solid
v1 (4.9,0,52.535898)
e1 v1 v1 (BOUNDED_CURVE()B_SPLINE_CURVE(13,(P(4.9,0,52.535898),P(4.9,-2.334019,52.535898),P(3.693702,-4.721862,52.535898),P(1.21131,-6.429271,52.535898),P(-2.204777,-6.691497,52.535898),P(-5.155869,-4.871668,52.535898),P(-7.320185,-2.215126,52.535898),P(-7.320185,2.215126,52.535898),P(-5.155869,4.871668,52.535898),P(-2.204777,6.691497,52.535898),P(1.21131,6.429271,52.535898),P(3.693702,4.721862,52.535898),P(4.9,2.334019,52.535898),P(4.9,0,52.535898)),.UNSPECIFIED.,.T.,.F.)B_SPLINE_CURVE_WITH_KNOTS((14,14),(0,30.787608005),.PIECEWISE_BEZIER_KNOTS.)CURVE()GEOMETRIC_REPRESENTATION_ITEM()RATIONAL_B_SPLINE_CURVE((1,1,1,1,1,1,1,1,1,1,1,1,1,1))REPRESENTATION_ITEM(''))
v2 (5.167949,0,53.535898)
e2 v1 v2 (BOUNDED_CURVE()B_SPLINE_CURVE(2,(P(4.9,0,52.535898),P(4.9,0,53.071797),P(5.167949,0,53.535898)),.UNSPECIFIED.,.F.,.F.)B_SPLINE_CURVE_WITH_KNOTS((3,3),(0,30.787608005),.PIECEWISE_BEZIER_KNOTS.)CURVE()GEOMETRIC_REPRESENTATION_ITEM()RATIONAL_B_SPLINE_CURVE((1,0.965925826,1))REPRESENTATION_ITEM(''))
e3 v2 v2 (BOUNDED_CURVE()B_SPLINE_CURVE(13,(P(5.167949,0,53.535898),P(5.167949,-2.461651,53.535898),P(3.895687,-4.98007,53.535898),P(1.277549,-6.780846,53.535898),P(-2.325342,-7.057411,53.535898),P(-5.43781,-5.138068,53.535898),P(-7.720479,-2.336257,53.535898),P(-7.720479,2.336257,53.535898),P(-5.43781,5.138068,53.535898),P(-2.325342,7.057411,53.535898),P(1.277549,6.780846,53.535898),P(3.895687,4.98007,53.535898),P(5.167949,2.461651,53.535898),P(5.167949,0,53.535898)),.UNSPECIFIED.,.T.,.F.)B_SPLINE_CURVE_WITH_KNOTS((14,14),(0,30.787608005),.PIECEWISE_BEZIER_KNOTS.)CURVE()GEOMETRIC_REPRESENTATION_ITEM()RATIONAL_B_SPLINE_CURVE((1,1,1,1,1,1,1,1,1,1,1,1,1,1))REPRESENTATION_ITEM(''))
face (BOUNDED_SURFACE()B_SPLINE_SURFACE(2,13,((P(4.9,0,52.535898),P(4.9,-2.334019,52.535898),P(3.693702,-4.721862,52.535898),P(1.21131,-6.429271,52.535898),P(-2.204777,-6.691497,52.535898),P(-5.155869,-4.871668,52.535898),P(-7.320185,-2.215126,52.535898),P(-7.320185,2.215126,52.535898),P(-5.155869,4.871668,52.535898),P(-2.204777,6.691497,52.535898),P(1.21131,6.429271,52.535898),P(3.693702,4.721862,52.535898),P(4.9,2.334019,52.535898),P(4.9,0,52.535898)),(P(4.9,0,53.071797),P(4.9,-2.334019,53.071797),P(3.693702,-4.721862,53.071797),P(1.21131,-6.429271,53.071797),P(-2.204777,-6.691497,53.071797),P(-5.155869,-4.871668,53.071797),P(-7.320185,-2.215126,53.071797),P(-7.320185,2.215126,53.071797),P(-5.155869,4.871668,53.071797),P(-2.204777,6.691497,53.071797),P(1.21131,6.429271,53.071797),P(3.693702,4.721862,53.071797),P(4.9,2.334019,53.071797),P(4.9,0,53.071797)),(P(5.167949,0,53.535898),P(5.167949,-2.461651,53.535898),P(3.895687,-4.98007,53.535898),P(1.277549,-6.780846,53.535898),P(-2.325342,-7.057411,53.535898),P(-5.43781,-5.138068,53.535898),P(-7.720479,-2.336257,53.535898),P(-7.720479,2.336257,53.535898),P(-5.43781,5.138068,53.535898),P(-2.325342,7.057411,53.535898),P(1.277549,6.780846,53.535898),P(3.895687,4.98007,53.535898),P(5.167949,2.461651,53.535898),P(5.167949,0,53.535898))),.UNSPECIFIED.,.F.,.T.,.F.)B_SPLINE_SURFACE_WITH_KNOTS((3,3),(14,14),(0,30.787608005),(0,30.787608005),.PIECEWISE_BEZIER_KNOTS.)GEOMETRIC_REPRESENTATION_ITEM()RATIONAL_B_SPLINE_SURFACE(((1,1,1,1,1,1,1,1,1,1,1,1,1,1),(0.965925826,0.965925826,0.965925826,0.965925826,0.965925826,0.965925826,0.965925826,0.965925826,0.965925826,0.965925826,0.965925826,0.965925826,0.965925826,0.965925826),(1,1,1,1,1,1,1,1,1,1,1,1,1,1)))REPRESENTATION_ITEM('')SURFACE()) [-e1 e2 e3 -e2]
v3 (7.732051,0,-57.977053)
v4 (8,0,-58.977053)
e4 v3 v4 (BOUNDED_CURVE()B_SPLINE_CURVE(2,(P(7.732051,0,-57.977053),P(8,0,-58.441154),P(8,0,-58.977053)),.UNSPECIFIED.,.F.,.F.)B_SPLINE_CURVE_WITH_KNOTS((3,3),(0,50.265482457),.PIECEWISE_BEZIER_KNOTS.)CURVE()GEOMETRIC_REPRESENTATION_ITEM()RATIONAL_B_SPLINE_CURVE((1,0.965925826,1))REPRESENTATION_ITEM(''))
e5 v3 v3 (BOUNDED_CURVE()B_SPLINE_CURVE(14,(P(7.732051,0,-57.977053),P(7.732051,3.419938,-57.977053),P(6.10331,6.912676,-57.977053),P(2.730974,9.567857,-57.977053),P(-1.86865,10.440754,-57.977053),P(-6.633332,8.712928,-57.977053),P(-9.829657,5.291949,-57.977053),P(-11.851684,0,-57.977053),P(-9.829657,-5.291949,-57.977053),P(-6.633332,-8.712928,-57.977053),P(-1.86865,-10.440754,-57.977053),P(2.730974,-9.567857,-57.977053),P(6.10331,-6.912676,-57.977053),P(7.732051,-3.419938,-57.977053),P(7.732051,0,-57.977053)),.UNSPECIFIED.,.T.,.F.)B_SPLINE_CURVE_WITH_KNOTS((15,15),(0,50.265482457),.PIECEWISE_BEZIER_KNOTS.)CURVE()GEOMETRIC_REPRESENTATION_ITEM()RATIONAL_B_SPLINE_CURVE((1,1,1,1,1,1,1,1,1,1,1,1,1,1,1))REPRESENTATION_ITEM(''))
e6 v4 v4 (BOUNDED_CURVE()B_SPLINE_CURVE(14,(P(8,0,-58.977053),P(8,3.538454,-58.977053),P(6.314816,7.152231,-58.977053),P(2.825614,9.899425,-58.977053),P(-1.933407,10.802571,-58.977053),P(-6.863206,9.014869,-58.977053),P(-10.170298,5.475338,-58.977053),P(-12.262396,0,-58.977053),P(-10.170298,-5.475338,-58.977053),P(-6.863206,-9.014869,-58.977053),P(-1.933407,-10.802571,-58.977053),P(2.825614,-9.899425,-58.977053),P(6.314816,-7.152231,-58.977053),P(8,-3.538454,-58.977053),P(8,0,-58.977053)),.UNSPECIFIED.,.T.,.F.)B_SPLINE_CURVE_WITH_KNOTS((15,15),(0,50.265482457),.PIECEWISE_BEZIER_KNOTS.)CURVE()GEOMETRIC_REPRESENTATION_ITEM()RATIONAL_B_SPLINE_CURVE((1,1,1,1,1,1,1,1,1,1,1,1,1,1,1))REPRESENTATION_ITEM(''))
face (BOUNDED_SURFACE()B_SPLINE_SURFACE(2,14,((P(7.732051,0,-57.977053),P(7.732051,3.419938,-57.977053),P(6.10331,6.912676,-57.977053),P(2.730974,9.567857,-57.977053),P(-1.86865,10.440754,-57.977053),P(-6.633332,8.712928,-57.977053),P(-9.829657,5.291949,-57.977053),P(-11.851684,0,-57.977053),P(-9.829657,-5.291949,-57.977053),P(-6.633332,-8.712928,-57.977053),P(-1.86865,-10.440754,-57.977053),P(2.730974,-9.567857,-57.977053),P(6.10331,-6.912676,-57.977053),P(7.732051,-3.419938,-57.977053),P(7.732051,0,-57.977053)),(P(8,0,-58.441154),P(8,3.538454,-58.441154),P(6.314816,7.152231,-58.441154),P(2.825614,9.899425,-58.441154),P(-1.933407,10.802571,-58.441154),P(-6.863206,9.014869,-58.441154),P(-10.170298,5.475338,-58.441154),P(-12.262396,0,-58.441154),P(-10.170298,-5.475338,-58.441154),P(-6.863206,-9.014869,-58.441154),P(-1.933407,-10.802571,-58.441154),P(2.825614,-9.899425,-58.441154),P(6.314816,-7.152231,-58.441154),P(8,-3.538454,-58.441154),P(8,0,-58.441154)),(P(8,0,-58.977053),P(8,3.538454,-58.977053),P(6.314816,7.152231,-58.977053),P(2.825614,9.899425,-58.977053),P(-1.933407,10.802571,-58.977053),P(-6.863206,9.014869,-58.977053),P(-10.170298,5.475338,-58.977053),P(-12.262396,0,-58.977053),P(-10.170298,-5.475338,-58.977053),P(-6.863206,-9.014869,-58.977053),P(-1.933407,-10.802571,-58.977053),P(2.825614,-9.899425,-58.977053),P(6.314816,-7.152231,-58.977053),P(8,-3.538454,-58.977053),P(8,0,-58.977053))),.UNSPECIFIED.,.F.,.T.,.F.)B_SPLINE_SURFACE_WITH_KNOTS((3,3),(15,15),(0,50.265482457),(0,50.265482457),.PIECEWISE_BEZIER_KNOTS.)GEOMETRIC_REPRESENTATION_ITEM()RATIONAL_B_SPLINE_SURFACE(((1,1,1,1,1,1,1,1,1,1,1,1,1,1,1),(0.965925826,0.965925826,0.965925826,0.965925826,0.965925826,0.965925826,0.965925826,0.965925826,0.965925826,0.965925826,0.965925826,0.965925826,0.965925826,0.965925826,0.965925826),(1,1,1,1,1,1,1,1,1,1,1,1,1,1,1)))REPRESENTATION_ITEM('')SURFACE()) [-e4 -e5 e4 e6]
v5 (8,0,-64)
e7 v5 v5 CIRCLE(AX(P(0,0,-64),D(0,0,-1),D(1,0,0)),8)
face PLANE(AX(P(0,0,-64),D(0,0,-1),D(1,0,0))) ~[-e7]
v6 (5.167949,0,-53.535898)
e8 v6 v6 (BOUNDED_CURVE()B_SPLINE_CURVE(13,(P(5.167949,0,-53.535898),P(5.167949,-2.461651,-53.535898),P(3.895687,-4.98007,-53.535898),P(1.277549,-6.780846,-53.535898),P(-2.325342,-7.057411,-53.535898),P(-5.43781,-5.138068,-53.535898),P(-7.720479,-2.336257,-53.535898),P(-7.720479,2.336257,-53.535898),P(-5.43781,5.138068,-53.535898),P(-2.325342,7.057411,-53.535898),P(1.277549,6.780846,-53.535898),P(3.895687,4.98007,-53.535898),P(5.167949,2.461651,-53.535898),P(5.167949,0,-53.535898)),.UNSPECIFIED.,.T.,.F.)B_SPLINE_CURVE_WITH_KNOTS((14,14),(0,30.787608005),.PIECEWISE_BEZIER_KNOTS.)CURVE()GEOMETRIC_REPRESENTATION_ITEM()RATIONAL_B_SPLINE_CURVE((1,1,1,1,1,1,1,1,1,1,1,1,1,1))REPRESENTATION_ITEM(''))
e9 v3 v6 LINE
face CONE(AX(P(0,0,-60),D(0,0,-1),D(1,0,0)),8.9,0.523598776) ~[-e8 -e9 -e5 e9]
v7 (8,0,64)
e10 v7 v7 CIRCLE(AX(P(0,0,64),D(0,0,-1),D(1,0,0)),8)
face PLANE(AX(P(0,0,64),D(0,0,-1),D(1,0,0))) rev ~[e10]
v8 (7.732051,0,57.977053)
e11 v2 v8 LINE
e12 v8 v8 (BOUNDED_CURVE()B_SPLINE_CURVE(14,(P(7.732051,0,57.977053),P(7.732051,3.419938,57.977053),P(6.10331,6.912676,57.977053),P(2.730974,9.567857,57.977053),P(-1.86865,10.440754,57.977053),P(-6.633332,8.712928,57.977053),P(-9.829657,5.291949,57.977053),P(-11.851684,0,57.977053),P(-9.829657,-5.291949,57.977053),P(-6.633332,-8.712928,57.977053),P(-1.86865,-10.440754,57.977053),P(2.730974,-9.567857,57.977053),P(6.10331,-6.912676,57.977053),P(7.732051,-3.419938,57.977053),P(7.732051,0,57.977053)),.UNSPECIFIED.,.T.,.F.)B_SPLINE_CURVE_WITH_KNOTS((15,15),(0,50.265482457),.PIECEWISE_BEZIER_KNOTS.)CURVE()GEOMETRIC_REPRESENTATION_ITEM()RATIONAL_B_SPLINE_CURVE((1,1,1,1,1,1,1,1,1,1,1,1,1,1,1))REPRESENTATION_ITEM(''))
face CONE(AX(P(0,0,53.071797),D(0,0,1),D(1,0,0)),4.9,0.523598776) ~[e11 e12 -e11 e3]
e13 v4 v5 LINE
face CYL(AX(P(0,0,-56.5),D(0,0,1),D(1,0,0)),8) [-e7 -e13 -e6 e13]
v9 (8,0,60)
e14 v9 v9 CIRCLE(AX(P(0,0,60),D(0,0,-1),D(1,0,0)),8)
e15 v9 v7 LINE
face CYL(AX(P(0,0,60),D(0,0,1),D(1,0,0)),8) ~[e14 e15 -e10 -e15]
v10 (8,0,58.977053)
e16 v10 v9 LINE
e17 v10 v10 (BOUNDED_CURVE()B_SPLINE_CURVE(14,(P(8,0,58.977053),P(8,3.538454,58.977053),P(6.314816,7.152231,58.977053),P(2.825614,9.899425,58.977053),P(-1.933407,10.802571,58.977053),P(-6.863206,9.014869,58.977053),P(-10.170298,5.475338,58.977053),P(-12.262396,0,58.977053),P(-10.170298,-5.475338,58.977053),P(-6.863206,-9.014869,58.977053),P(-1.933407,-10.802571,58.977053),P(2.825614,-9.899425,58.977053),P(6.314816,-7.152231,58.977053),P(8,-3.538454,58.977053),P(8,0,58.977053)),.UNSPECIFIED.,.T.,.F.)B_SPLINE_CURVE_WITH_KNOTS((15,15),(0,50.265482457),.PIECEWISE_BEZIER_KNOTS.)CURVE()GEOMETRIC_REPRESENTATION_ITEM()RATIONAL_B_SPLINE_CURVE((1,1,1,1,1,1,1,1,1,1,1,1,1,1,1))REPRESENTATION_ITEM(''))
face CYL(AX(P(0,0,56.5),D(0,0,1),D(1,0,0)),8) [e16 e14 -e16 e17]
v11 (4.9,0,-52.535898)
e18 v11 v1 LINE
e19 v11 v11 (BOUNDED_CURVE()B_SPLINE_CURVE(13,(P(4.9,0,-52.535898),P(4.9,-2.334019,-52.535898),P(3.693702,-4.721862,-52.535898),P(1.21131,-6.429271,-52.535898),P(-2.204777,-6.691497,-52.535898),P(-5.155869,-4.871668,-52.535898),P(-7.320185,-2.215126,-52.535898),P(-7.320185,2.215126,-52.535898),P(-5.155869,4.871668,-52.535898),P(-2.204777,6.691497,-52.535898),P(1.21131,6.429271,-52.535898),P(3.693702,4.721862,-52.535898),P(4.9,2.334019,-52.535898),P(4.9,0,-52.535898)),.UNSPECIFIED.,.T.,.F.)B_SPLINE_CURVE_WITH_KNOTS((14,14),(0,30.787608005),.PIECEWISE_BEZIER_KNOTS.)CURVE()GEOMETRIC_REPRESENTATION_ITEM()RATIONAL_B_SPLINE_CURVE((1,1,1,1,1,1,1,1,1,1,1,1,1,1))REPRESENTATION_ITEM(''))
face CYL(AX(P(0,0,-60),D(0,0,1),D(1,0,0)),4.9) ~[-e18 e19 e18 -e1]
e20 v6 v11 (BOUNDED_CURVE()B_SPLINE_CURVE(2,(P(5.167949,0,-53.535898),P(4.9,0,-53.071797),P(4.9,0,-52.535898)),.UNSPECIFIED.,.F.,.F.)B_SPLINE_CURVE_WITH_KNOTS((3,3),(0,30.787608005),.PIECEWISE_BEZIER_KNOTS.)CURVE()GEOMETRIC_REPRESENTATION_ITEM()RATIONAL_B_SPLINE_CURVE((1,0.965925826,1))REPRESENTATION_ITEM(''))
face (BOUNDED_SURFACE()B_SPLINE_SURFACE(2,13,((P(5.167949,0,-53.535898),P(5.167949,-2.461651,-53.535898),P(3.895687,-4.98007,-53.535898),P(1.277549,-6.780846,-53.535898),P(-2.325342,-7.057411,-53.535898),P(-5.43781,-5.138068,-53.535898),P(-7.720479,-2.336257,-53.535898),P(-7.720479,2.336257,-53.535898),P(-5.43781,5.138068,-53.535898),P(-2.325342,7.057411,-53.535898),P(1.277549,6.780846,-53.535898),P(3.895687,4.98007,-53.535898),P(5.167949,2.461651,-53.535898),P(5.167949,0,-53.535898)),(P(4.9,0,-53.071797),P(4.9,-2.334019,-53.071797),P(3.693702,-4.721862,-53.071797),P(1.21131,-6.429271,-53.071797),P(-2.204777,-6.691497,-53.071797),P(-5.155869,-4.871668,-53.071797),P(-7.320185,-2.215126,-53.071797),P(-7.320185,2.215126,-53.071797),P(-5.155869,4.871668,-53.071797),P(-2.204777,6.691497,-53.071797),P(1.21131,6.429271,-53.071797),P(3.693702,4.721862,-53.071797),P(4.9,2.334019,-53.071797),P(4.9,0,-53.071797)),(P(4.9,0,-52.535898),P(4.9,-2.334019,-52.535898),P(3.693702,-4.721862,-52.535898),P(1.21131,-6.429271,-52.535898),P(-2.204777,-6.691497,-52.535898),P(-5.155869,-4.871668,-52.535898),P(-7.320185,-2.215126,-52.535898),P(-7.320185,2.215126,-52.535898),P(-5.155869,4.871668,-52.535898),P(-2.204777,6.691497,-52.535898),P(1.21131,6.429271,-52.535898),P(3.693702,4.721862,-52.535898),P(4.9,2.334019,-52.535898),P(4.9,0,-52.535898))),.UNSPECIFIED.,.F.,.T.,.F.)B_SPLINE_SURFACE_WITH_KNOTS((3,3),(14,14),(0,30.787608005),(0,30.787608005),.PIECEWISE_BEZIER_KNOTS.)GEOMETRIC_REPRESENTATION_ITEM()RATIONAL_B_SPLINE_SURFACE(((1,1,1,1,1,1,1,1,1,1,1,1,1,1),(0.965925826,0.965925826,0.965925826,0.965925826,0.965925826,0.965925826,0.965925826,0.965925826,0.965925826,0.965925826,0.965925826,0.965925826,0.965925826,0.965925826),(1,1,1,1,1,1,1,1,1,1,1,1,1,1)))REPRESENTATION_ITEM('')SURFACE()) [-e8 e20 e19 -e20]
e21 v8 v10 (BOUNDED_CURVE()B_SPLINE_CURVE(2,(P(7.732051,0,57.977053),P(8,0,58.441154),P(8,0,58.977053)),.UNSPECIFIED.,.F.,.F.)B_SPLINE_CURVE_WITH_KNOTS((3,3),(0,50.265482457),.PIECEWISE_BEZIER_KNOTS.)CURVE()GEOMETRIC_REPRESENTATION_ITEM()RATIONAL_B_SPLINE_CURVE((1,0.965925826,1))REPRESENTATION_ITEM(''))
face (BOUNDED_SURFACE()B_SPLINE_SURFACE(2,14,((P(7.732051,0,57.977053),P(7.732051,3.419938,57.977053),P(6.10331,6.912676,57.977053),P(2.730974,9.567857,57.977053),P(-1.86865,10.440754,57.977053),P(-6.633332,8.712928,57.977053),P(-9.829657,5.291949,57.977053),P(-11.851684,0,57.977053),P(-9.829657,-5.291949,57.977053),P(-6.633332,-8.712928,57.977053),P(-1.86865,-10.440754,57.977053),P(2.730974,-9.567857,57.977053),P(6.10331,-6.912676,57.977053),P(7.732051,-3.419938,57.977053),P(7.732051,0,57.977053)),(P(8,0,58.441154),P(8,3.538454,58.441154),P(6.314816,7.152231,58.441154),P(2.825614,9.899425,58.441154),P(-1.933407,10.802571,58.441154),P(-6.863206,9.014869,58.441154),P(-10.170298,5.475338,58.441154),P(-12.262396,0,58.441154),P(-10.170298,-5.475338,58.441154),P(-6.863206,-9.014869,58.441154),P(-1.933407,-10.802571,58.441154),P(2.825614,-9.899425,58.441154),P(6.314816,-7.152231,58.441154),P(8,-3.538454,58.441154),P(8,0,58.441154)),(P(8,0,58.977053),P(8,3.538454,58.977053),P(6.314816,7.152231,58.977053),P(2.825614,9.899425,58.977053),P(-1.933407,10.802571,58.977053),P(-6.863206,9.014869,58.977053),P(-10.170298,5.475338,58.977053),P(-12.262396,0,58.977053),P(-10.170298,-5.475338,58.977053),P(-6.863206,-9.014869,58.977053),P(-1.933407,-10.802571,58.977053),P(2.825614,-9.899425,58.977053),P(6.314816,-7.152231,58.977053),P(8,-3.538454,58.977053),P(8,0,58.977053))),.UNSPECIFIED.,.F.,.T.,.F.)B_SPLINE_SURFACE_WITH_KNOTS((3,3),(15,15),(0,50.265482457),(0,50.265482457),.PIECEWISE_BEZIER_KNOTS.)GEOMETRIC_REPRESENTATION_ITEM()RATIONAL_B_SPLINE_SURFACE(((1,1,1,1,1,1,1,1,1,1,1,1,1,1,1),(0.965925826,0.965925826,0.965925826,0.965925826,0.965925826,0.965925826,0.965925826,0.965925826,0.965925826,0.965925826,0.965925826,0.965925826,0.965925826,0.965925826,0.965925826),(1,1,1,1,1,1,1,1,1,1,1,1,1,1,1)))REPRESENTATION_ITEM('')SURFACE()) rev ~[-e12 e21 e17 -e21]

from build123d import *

# Parameters (mm, degrees)
F0_W        = 4.9
F0_H        = 60
F2_S5_R     = 8
F2_T6_DEPTH = 15
F3_S5_R     = 8
F3_T6_DEPTH = 15
F4_R        = 2


# Not quite as in the source:
# - a fillet or chamfer that OpenCascade refuses, or shapes differently, is made with other operations: its cross-section is extruded or revolved along the edge and cut away or added


with BuildPart() as f1:
    # F0 (on Front) → F1 (revolve)
    with BuildSketch(Plane.XZ):
        Polygon((0, 64), (0, 60), (4.9, 60), (8, 60), (8, 64), align=None)
        with Locations((2.45, 30)):
            Rectangle(F0_W, F0_H)
        with Locations((2.45, -30)):
            Rectangle(F0_W, F0_H)
        Polygon((4.9, -60), (0, -60), (0, -64), (8, -64), (8, -60), align=None)
    revolve(axis=Axis((0, 0, -30), (0, 0, -1)))

    # F2: chamfer of 4 x 6.9282032303 on 1 edges, made by hand


with BuildPart() as f2_tool2:
    # F2_s3 → F2_t4 (revolve)
    with BuildSketch(Plane.XZ):
        Polygon((4.9, 53.0717967697), (8.9, 60), (4.9, 60), align=None)
    revolve(axis=Axis((0, 0, 60), (0, 0, -1)))

    # F2_s5 → F2_t6 (intersect, symmetric)
    with BuildSketch(Plane.XY.offset(56.5)):
        Circle(F2_S5_R)
    extrude(amount=F2_T6_DEPTH, both=True, mode=Mode.INTERSECT)


with BuildPart() as f1_1:
    add(f1.part)

    # F2_t1: union F2_tool2
    add(f2_tool2.part)

    # F3: chamfer of 4 x 6.9282032303 on 1 edges, made by hand


with BuildPart() as f3_tool2:
    # F3_s3 → F3_t4 (revolve)
    with BuildSketch(Plane.XZ):
        Polygon((8.9, -60), (4.9, -53.0717967697), (4.9, -60), align=None)
    revolve(axis=Axis((0, 0, -60), (0, 0, -1)))

    # F3_s5 → F3_t6 (intersect, symmetric)
    with BuildSketch(Plane.XY.offset(-56.5)):
        Circle(F3_S5_R)
    extrude(amount=F3_T6_DEPTH, both=True, mode=Mode.INTERSECT)


with BuildPart() as f1_2:
    add(f1_1.part)

    # F3_t1: union F3_tool2
    add(f3_tool2.part)

    # F4
    f4_edges = [f1_2.edges().sort_by_distance(p)[0] for p in [
        (-8, 0, -58.441154),
        (-4.9, 0, -53.071797),
        (-4.9, 0, 53.071797),
        (-8, 0, 58.441154),
    ]]
    fillet(f4_edges, radius=F4_R)


solid = f1_2.part
